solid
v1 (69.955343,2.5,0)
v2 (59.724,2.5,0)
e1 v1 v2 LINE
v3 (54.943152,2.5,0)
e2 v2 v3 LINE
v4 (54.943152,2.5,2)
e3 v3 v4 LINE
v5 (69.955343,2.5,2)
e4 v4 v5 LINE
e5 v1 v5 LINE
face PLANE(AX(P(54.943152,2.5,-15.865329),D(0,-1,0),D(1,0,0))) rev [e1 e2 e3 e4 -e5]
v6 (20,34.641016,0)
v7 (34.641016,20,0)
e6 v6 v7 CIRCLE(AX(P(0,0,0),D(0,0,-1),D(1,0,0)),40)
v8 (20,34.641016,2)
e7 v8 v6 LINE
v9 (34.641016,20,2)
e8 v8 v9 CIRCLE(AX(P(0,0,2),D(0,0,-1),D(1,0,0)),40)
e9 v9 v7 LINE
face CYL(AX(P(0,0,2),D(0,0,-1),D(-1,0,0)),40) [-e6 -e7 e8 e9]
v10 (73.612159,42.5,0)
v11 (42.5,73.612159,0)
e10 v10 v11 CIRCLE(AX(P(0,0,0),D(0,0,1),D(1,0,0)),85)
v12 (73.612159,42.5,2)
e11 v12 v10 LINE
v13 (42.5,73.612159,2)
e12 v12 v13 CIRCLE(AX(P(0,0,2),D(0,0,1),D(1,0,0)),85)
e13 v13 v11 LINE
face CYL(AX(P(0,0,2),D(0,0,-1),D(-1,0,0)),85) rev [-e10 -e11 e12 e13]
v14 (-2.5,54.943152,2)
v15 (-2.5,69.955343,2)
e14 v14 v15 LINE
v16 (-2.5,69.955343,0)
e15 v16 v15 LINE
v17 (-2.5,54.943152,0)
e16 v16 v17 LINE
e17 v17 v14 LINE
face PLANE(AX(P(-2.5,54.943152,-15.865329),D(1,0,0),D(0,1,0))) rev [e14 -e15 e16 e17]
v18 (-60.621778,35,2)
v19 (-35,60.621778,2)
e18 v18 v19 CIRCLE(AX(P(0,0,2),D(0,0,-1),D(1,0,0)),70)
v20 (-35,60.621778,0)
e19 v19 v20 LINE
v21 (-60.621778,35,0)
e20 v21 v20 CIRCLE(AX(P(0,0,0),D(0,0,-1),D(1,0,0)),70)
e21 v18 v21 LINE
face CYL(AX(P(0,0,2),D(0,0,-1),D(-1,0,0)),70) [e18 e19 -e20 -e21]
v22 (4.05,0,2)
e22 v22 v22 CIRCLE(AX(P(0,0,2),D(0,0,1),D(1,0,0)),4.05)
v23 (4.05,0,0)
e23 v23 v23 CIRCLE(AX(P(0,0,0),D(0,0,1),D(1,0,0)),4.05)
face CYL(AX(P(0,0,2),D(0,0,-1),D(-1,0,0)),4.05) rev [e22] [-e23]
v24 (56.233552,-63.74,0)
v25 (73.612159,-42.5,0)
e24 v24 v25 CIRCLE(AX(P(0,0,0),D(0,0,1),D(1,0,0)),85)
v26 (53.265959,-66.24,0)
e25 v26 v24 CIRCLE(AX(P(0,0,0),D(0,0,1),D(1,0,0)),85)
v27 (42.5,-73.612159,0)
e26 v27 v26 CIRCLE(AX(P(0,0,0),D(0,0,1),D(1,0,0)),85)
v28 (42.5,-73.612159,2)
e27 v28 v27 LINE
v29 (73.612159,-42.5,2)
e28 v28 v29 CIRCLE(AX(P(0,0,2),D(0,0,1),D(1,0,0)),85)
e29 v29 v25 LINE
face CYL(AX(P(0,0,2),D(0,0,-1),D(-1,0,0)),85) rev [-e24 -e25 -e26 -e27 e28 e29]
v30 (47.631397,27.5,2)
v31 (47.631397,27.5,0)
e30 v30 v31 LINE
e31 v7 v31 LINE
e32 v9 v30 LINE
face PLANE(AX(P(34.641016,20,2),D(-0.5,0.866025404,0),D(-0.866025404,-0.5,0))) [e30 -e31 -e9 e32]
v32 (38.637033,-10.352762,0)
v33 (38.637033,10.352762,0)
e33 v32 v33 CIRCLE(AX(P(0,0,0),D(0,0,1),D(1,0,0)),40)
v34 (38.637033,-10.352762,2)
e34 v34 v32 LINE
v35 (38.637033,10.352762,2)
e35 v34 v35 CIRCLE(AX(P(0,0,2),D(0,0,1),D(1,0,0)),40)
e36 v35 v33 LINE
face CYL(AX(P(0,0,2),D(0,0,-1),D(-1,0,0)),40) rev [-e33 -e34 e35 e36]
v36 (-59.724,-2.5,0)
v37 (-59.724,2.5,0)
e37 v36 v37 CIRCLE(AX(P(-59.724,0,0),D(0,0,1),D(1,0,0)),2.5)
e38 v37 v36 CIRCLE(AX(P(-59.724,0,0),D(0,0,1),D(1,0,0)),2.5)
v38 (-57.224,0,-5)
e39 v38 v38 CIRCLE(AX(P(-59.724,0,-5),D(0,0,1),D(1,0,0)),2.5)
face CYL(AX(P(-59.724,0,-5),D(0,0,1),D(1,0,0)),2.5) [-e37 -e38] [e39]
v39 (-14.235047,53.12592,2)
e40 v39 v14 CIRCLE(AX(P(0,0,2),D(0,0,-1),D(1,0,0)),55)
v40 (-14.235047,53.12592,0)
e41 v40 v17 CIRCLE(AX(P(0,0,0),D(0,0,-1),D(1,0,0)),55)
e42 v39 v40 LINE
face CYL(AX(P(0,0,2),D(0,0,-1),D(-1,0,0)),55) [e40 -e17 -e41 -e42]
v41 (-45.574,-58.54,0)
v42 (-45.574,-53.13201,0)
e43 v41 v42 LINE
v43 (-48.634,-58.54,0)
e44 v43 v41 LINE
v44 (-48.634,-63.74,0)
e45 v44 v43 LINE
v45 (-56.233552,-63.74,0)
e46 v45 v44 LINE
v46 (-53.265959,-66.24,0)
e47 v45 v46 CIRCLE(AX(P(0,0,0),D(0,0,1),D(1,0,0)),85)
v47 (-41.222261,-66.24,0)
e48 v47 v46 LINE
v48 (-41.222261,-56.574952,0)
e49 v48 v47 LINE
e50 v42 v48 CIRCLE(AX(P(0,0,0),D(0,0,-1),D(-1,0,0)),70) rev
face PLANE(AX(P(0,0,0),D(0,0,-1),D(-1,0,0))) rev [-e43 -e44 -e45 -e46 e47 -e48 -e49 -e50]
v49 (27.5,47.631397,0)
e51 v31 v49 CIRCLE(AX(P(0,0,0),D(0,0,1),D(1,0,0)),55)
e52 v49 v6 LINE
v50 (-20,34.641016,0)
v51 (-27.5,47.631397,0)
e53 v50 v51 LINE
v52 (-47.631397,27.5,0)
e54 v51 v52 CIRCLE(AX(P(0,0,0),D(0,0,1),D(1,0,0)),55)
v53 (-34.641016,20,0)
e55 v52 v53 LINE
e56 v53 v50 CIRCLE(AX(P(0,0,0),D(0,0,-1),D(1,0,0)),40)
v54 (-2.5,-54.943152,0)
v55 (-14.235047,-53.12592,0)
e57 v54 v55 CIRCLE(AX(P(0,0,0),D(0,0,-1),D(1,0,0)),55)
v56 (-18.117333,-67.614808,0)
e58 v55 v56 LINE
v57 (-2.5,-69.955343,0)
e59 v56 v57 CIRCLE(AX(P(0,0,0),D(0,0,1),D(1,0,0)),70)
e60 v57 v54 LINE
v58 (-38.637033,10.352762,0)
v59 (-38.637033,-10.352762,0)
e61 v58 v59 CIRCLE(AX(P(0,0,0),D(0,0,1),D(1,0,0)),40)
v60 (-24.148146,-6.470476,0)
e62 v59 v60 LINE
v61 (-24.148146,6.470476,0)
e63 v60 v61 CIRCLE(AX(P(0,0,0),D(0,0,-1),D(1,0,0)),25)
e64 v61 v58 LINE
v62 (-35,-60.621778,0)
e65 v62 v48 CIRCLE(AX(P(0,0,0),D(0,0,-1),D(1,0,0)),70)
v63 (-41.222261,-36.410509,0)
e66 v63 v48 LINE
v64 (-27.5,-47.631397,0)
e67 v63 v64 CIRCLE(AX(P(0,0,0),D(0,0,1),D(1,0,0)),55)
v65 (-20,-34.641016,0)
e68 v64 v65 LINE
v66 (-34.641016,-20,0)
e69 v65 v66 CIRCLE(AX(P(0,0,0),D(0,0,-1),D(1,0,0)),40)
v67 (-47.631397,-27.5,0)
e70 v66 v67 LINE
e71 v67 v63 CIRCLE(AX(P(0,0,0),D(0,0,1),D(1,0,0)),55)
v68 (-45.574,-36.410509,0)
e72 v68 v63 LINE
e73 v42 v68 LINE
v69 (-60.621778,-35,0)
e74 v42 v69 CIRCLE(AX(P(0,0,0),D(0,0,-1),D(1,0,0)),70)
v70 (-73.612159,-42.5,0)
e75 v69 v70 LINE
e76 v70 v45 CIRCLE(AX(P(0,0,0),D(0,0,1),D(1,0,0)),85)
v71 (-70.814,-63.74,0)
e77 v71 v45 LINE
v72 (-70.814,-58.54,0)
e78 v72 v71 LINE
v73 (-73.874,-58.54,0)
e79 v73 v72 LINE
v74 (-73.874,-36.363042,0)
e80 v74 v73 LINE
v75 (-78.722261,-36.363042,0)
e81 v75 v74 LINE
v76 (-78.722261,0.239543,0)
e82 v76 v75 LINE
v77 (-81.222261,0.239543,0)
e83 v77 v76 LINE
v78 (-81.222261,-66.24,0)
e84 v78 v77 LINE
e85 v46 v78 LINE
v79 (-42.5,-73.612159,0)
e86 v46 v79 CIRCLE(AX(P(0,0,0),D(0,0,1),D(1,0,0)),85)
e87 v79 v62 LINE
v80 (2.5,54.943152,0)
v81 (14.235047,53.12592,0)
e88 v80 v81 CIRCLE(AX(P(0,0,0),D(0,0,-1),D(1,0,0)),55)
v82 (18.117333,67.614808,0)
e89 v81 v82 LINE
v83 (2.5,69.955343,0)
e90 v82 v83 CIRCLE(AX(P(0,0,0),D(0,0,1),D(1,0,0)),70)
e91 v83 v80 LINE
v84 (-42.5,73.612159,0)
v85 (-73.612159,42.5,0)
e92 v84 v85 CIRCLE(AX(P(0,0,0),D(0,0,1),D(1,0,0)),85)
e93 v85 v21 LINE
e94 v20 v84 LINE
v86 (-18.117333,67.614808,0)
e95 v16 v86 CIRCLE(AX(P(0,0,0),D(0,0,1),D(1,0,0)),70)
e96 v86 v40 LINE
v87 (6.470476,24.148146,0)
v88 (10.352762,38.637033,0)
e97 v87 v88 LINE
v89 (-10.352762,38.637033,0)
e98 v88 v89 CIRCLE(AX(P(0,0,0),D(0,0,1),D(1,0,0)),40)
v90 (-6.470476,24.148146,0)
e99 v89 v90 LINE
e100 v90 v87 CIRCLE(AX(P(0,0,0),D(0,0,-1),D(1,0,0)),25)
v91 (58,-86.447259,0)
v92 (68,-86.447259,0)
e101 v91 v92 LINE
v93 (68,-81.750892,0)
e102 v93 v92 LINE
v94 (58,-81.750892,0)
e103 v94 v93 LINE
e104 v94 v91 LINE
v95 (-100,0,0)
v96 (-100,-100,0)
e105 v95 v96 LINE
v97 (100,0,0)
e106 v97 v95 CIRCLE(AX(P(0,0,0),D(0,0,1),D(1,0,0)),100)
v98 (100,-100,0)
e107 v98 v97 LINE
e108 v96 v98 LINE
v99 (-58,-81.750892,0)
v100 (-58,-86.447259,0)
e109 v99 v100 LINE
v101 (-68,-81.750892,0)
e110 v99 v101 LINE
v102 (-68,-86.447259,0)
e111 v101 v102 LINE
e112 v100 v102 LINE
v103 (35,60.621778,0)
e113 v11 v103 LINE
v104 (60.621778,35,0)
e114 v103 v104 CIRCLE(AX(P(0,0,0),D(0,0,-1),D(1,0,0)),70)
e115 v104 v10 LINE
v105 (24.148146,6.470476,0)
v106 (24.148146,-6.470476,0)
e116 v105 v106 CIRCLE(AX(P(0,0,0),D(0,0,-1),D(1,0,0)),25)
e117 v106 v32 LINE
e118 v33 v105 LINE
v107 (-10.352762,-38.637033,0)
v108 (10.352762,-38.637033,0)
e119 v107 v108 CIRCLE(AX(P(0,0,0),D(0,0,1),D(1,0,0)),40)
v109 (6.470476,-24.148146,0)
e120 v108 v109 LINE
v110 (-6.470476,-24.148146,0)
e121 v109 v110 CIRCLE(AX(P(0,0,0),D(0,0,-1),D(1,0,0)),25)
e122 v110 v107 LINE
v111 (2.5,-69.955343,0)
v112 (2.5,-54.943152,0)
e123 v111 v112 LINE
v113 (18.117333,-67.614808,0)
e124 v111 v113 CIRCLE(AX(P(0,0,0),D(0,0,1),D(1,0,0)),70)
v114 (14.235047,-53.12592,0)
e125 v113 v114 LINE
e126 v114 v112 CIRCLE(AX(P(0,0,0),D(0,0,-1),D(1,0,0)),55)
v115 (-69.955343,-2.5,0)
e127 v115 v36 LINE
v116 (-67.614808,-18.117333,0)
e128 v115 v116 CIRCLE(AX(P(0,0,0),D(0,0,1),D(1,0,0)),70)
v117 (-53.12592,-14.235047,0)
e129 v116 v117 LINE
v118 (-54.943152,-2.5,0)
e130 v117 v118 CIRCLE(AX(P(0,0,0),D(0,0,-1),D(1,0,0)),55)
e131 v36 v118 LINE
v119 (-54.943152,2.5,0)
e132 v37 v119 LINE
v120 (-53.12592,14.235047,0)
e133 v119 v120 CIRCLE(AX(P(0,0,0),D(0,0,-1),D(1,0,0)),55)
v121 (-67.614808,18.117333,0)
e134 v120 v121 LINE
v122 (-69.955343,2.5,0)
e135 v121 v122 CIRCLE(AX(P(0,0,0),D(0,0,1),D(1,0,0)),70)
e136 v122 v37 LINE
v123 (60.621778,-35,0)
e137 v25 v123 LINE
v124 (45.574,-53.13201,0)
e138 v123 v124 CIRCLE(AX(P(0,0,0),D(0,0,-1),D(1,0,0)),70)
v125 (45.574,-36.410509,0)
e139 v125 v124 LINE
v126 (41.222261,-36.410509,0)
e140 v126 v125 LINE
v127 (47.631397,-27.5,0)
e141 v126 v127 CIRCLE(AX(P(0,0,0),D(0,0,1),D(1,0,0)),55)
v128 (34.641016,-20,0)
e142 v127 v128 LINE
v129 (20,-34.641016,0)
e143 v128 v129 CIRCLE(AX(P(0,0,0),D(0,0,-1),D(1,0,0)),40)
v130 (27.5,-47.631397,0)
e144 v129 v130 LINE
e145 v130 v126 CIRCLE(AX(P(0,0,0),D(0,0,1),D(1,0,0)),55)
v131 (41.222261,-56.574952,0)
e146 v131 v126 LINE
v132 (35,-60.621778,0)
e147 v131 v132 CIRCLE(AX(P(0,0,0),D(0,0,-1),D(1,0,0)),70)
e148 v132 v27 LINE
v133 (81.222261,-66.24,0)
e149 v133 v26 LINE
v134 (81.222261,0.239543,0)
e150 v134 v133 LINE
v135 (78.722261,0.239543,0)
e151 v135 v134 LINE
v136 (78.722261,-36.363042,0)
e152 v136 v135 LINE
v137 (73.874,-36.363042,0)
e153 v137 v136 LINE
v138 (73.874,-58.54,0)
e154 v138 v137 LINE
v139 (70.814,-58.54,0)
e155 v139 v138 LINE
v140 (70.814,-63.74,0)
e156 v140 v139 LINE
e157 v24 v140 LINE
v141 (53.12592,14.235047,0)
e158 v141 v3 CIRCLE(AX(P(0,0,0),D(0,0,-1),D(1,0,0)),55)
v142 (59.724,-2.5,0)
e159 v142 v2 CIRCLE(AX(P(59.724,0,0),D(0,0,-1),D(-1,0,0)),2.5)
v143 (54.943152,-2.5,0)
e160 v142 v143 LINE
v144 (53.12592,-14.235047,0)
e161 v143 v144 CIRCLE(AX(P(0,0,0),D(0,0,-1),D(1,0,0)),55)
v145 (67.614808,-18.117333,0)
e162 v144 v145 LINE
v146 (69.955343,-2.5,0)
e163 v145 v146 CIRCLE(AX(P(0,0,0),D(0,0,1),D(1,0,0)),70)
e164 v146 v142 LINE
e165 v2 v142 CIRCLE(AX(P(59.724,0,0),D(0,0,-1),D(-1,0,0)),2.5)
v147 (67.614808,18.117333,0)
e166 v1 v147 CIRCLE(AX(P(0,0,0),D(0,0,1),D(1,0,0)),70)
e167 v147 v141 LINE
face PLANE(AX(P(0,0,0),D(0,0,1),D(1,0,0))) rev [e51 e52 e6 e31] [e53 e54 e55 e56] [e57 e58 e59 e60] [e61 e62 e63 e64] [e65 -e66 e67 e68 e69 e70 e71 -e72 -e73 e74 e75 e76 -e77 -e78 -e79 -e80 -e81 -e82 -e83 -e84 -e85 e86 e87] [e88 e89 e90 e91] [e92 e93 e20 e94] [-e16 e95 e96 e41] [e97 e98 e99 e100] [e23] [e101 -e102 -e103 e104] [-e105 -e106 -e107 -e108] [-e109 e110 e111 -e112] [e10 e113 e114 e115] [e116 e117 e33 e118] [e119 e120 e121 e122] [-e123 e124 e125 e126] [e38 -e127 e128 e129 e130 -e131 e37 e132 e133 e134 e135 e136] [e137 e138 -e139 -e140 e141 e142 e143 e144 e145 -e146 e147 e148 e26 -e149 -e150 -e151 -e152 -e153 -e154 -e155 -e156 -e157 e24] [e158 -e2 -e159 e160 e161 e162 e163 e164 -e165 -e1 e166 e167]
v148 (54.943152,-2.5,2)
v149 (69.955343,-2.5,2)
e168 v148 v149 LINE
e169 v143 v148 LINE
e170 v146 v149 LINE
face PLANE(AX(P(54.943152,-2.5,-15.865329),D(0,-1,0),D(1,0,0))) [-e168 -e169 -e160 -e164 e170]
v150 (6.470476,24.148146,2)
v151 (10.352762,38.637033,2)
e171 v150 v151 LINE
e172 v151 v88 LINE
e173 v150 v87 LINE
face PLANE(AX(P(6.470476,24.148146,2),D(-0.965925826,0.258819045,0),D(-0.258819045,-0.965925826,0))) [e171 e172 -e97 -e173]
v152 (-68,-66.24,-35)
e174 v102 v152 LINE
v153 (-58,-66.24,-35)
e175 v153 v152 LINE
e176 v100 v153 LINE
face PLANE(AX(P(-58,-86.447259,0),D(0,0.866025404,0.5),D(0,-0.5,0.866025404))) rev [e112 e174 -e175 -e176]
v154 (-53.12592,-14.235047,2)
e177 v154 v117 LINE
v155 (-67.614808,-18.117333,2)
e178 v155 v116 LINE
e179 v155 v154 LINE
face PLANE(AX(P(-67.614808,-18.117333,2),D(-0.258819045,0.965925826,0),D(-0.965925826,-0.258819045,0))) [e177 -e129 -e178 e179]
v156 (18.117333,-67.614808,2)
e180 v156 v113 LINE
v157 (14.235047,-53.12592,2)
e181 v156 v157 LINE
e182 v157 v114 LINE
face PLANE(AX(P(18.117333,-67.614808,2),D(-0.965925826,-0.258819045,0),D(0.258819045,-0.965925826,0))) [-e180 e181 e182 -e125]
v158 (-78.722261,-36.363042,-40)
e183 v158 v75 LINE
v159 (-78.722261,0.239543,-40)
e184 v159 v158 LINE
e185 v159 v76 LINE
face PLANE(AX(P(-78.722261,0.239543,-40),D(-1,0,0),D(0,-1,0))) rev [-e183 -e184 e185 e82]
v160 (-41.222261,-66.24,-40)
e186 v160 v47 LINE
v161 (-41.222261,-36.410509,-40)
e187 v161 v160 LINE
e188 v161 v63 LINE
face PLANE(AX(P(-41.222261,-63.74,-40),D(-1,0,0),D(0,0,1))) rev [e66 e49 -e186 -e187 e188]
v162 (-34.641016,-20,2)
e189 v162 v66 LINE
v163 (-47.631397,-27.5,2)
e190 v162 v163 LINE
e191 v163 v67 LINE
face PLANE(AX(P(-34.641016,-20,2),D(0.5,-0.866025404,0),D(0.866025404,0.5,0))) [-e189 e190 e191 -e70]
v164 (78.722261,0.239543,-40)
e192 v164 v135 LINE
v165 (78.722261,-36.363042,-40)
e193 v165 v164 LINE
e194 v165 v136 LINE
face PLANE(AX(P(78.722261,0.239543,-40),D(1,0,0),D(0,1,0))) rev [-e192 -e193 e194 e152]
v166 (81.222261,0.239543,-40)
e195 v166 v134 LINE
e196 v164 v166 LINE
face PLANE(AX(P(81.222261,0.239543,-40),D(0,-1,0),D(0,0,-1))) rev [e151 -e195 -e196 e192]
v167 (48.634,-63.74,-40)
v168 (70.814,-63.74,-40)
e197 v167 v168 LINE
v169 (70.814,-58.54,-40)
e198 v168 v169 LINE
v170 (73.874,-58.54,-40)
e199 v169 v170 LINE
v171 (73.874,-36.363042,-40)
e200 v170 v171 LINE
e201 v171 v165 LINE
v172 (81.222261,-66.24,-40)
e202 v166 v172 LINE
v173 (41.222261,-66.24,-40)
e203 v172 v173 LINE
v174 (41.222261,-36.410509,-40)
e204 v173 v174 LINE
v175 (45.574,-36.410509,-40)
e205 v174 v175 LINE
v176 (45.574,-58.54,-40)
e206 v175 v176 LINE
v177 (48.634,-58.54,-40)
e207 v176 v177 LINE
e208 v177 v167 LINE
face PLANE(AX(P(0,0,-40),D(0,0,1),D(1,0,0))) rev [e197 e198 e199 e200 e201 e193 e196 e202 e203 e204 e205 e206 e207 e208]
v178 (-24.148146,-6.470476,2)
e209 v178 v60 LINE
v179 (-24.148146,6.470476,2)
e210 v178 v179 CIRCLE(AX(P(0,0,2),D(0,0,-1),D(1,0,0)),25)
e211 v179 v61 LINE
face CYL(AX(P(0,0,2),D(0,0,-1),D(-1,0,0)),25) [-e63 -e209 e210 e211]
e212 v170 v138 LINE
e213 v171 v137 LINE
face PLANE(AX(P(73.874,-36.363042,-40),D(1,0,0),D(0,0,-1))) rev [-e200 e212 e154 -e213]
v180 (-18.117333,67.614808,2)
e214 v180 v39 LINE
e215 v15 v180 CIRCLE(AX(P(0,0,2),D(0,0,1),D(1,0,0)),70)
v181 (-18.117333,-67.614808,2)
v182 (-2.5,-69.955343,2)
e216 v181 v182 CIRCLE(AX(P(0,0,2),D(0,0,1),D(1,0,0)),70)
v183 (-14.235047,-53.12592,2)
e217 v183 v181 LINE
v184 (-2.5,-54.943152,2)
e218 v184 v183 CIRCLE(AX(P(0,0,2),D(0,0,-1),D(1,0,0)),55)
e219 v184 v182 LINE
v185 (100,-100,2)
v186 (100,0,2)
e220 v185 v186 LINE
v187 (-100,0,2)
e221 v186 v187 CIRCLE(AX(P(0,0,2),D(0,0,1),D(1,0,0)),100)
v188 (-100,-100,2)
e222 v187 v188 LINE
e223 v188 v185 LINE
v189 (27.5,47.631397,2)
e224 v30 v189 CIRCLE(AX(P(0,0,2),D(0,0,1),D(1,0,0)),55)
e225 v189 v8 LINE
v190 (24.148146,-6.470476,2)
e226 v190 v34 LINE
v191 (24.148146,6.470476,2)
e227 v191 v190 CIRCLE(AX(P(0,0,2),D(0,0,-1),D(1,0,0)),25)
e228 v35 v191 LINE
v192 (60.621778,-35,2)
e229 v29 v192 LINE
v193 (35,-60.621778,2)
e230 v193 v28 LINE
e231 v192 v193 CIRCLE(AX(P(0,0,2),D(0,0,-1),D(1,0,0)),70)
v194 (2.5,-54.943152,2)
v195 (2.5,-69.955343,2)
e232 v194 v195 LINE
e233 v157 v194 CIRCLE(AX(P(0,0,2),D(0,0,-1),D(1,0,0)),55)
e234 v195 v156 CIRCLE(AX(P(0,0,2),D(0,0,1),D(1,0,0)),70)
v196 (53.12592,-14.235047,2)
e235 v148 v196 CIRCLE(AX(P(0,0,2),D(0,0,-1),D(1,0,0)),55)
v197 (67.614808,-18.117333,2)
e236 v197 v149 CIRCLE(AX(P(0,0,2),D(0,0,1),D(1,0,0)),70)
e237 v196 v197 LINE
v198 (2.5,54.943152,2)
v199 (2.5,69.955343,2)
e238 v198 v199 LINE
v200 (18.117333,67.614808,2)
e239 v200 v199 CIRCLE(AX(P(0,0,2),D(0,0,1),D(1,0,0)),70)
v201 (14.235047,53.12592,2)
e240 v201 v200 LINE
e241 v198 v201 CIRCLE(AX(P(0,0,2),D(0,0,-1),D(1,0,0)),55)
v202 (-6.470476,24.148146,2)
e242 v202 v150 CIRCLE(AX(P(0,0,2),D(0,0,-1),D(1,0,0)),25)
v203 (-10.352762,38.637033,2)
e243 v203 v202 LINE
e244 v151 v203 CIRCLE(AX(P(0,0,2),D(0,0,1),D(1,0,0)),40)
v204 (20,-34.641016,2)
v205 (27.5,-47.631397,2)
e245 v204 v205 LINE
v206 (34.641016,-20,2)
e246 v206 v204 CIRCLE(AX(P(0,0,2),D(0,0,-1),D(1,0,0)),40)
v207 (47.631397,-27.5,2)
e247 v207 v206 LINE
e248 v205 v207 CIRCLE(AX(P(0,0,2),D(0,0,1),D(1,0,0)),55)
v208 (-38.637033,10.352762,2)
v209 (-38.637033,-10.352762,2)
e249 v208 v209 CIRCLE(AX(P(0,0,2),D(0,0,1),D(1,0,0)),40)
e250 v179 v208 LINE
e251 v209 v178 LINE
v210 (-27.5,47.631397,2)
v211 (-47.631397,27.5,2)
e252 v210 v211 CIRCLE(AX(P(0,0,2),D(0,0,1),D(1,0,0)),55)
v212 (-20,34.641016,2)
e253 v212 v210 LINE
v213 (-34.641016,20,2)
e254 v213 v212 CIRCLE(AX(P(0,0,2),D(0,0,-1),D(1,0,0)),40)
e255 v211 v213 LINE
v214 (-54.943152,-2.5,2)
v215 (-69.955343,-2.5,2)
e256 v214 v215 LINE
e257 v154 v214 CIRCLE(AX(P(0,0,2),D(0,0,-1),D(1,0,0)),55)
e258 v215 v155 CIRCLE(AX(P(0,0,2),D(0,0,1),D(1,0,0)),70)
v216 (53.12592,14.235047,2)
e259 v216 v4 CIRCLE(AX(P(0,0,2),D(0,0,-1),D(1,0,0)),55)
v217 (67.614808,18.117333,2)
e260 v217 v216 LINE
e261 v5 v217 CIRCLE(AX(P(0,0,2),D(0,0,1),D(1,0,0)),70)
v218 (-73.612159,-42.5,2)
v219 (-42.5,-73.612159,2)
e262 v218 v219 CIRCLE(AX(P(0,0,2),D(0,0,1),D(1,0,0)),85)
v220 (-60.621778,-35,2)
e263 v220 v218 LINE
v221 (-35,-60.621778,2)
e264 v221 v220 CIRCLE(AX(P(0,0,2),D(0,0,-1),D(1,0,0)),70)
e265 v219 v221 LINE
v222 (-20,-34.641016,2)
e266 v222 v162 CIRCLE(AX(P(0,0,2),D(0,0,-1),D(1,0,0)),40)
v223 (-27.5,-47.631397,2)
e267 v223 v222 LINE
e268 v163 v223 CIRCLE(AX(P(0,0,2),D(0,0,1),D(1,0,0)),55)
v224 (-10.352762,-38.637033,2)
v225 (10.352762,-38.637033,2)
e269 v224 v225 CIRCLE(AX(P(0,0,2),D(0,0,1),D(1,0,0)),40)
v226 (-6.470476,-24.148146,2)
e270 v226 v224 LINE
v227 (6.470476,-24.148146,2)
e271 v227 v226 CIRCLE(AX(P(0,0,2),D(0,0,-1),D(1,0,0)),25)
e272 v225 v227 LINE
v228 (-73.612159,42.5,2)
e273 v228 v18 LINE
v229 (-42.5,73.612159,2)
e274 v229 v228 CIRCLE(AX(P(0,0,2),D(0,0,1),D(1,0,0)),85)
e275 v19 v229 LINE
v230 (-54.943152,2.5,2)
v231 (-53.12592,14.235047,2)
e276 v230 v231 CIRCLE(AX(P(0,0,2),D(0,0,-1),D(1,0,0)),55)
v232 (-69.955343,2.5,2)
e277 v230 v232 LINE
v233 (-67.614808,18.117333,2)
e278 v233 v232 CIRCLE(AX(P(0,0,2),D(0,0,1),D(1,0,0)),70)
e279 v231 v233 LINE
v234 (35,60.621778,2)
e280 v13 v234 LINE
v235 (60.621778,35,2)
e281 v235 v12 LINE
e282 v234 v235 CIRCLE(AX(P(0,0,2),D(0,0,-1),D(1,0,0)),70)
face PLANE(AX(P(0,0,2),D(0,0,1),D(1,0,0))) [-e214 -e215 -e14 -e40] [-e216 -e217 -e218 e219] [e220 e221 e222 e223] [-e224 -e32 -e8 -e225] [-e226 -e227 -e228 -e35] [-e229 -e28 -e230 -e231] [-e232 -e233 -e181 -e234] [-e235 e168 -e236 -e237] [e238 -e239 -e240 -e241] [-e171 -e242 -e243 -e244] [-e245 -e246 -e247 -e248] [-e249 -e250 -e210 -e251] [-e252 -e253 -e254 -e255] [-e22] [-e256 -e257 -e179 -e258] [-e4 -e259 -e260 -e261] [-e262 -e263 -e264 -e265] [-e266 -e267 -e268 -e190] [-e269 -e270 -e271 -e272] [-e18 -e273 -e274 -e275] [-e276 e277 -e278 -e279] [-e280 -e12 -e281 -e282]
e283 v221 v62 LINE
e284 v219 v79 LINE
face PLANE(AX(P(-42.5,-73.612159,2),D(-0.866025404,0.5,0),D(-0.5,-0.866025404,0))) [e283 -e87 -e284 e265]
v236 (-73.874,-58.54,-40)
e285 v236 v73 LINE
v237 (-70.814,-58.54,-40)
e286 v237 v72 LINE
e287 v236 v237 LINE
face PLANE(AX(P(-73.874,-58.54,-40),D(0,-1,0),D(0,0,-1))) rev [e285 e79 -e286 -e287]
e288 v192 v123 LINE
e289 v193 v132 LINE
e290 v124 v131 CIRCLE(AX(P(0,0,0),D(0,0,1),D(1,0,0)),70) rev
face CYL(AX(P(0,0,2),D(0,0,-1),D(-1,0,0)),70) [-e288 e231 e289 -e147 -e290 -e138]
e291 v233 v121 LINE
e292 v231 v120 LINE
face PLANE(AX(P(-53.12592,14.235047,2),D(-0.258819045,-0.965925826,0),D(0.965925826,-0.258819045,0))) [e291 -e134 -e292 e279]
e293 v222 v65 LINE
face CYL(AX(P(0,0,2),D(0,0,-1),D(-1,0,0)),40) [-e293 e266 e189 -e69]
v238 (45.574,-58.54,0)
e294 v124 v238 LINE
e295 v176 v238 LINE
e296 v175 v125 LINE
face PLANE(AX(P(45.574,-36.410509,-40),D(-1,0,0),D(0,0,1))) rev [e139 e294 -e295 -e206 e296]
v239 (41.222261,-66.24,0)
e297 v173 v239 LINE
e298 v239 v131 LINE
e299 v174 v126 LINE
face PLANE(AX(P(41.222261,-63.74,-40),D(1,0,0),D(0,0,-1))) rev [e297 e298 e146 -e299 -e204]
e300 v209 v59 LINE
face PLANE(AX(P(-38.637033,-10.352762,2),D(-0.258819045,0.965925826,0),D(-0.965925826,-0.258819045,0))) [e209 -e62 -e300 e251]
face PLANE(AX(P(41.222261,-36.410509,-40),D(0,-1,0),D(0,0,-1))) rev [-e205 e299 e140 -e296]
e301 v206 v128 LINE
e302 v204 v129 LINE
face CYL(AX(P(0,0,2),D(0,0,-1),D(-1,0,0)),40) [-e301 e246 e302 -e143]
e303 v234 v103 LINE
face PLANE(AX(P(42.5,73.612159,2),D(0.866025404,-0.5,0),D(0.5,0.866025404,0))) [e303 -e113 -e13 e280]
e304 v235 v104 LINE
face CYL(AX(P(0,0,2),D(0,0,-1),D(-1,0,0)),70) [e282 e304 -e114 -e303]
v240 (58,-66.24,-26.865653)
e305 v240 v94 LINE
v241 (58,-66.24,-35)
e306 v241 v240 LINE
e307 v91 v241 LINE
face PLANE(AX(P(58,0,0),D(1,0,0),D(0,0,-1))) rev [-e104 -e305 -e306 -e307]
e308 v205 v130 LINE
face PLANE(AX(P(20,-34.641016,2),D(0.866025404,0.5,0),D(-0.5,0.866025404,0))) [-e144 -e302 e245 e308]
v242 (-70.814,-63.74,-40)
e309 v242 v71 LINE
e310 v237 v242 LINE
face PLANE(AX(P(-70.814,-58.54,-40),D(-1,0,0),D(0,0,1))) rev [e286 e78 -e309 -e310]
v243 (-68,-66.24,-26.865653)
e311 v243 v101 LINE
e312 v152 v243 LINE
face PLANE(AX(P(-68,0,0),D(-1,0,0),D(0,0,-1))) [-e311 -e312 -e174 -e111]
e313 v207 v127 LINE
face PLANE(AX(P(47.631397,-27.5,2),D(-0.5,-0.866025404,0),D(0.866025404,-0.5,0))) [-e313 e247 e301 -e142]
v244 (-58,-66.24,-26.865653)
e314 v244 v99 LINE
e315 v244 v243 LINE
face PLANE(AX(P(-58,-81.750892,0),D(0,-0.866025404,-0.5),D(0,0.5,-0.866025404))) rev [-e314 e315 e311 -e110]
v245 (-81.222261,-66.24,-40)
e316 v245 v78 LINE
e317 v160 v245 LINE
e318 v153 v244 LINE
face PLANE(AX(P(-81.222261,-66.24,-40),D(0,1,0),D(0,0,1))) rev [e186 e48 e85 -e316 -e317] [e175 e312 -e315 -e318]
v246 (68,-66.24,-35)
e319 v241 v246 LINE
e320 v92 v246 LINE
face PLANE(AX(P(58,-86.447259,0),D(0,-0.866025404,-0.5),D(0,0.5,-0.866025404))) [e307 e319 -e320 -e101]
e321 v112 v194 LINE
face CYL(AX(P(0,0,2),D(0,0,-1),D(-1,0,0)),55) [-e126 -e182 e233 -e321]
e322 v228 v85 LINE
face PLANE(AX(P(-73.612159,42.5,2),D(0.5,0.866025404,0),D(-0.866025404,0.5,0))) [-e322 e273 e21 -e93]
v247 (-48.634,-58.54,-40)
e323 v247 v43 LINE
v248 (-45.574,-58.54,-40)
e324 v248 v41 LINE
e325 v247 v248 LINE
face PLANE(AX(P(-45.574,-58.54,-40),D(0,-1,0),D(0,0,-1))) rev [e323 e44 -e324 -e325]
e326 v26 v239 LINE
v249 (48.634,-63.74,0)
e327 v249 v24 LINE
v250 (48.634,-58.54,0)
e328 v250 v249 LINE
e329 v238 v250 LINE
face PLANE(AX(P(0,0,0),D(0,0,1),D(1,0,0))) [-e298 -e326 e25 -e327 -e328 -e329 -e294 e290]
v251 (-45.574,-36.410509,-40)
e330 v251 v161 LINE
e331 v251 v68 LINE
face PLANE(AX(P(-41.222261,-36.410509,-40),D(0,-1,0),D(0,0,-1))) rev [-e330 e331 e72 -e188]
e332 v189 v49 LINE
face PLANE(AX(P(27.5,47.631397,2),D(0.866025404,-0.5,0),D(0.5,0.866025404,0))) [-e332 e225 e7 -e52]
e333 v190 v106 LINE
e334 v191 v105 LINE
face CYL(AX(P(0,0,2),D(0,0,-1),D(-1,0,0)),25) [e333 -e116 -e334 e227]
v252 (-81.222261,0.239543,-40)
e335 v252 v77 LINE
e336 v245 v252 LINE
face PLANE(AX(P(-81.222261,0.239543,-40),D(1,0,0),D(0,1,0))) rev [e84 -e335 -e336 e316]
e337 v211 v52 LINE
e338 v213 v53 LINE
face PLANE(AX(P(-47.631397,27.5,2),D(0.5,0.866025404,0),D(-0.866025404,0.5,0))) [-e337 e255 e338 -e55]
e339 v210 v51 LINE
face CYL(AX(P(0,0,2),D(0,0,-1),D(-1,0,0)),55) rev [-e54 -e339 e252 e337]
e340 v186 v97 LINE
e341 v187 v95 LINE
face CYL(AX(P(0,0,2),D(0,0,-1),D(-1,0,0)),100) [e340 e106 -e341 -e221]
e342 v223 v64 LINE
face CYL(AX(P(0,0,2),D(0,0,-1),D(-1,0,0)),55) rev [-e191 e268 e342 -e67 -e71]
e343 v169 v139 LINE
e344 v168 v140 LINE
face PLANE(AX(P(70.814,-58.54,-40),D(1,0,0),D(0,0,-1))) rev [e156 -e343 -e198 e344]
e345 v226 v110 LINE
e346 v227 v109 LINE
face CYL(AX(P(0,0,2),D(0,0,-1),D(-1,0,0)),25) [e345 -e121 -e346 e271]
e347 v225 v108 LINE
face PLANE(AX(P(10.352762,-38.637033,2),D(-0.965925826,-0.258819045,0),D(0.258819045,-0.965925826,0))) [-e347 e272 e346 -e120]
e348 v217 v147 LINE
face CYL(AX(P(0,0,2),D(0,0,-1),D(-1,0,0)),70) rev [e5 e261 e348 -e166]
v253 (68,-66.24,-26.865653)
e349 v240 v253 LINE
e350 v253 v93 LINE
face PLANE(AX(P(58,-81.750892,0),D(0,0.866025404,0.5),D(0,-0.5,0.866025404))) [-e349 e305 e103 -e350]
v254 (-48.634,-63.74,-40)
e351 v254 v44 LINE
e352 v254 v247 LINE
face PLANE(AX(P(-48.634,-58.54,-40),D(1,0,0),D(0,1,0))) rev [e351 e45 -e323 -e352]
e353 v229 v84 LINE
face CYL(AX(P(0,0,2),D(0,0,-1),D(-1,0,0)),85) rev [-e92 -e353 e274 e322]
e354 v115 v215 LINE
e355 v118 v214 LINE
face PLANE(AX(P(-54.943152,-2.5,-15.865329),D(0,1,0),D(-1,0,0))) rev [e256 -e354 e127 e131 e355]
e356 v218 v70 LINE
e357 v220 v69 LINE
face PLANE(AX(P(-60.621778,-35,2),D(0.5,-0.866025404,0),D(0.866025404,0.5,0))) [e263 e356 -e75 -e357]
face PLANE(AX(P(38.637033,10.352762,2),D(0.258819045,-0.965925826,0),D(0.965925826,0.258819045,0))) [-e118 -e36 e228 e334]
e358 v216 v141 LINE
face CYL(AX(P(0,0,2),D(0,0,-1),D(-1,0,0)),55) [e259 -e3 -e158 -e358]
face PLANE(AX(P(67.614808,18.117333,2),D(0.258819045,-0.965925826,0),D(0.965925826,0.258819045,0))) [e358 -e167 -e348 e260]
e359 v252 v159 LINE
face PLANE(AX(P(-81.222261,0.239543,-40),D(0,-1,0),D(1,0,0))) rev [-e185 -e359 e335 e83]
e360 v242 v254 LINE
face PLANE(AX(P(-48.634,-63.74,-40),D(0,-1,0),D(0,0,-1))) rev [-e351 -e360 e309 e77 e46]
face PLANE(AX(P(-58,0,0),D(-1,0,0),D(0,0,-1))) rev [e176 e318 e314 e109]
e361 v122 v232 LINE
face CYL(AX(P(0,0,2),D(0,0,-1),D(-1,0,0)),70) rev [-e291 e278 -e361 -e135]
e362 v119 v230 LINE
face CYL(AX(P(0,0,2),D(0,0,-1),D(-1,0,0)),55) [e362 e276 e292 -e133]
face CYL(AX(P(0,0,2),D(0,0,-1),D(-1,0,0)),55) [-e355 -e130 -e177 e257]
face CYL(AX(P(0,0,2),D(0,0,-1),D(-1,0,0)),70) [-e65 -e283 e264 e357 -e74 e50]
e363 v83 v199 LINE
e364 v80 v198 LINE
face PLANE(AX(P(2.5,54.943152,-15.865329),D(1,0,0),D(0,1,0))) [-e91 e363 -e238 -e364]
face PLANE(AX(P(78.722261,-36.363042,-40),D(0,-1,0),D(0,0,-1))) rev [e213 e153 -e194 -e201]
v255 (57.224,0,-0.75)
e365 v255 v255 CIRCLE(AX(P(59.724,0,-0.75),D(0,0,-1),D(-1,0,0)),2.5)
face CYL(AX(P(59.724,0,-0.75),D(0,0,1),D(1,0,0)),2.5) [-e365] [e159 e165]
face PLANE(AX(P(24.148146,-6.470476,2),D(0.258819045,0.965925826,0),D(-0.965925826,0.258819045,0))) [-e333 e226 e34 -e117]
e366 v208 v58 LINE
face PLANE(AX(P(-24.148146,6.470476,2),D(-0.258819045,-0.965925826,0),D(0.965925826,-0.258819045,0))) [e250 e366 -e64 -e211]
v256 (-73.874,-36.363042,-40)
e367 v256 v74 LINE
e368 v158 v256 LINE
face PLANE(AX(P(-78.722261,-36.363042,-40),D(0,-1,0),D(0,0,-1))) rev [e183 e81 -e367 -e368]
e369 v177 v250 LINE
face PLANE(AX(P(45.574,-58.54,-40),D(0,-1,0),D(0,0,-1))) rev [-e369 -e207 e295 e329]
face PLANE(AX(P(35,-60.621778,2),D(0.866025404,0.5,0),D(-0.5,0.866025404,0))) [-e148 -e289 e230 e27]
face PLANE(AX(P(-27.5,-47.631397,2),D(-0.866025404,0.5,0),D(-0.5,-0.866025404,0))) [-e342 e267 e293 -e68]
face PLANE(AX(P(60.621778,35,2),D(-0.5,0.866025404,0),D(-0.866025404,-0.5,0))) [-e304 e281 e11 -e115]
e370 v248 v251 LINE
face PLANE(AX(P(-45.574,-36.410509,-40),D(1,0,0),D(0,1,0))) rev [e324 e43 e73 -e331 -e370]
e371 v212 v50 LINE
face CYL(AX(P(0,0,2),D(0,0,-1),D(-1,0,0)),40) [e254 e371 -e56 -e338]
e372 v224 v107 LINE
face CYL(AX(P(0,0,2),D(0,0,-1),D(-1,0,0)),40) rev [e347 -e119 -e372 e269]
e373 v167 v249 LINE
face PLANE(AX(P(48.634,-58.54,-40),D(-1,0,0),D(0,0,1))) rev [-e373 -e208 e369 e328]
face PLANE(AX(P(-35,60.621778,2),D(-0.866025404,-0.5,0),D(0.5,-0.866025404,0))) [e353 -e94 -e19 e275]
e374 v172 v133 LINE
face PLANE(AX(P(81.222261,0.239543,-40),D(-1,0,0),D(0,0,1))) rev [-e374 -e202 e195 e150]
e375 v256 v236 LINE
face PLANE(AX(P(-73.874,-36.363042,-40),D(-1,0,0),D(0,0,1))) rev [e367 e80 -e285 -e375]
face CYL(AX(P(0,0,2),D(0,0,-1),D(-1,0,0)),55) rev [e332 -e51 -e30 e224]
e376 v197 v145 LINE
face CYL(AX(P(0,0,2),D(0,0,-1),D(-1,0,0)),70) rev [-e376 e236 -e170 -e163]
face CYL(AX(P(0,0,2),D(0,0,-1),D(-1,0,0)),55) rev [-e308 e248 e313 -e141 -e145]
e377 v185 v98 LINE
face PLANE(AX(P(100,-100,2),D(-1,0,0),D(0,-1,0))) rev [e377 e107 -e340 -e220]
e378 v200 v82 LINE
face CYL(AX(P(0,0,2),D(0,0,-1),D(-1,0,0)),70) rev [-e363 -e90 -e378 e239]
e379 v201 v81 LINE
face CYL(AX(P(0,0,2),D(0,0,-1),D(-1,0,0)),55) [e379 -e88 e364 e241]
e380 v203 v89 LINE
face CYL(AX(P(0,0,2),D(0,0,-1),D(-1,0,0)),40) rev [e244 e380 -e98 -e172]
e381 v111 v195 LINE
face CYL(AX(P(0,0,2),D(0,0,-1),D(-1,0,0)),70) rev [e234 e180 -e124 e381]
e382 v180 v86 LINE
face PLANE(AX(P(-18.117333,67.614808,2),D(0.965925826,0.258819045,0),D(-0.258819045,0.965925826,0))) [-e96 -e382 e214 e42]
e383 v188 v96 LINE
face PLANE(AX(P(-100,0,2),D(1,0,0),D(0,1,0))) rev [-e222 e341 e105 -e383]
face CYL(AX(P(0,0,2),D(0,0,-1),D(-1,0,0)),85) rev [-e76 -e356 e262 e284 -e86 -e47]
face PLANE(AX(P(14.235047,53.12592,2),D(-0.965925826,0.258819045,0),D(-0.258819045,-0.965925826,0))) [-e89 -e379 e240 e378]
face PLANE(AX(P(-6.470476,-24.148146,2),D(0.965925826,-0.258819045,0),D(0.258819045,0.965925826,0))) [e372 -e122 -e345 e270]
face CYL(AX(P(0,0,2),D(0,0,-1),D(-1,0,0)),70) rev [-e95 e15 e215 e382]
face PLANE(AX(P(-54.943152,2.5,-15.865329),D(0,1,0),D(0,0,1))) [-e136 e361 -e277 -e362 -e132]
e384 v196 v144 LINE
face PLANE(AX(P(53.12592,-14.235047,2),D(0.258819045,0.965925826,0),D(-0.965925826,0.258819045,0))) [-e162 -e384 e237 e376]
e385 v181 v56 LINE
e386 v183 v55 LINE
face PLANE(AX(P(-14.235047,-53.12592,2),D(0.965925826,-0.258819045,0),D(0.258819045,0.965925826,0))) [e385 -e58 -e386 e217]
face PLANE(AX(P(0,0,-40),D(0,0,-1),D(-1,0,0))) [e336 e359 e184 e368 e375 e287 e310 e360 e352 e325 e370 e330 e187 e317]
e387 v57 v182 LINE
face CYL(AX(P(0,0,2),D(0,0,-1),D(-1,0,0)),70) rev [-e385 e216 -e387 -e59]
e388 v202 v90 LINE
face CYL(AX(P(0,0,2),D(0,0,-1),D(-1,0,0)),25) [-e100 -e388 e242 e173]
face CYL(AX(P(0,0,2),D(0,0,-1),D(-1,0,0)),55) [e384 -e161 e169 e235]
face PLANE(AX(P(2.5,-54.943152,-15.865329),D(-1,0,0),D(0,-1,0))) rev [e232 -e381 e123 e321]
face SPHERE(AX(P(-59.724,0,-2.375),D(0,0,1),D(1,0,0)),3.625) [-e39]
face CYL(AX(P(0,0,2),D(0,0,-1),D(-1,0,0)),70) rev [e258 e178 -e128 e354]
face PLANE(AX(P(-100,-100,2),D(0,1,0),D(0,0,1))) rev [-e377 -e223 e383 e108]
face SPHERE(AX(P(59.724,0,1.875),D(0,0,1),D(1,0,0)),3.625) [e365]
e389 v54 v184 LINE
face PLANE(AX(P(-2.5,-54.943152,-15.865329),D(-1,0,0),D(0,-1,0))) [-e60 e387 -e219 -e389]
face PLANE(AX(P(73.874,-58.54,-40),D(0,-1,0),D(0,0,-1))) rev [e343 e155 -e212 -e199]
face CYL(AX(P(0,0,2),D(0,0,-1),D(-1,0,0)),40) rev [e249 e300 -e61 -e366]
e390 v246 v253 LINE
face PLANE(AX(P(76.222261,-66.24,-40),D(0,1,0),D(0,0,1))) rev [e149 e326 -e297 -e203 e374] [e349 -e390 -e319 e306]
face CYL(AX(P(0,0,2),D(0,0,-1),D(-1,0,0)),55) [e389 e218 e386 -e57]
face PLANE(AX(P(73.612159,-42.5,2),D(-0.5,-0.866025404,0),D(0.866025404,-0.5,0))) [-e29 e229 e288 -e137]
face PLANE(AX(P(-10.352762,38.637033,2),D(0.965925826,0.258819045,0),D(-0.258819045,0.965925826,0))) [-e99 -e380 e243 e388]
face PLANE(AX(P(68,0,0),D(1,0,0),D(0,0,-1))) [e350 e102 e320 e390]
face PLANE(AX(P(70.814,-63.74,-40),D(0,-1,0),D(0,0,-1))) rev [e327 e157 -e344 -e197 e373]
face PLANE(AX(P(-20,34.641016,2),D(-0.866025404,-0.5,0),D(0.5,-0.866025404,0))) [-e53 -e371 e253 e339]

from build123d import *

# Parameters (mm, degrees)
SKETCH2_R           = 4.05
BOSS_EXTRUDE1_DEPTH = 2
BOSS_EXTRUDE2_DEPTH = 40
BOSS_EXTRUDE3_DEPTH = 5
BOSS_EXTRUDE4_DEPTH = 2
SKETCH10_R          = 2.5
BOSS_EXTRUDE5_DEPTH = 7
DOME1_FACE_RADIUS   = 2.5
DOME1_HEIGHT        = 1
SKETCH12_R          = 2.5
BOSS_EXTRUDE6_DEPTH = 0.75
DOME2_FACE_RADIUS   = 2.5
DOME2_HEIGHT        = 1


with BuildPart() as part:
    # Sketch2 → Boss-Extrude1 (new body)
    with BuildSketch(Plane.XY):
        with BuildLine():
            Line((-100, 0), (-100, -100))
            Line((-100, -100), (100, -100))
            Line((100, -100), (100, 0))
            ThreePointArc((100, 0), (0, 100), (-100, 0))
        make_face()
        Circle(SKETCH2_R, mode=Mode.SUBTRACT)
        with BuildLine():
            Line((6.470476128, 24.148145657), (10.352761804, 38.637033052))
            ThreePointArc((10.352761804, 38.637033052), (0, 40), (-10.352761804, 38.637033052))
            Line((-10.352761804, 38.637033052), (-6.470476128, 24.148145657))
            ThreePointArc((-6.470476128, 24.148145657), (0, 25), (6.470476128, 24.148145657))
        make_face(mode=Mode.SUBTRACT)
        with BuildLine():
            Line((14.235047481, 53.125920446), (18.117333157, 67.61480784))
            ThreePointArc((18.117333157, 67.61480784), (0, 70), (-18.117333157, 67.61480784))
            Line((-18.117333157, 67.61480784), (-14.235047481, 53.125920446))
            ThreePointArc((-14.235047481, 53.125920446), (0, 55), (14.235047481, 53.125920446))
        make_face(mode=Mode.SUBTRACT)
        with BuildLine():
            Line((-20, 34.641016151), (-27.5, 47.631397208))
            ThreePointArc((-27.5, 47.631397208), (-38.890872965, 38.890872965), (-47.631397208, 27.5))
            Line((-47.631397208, 27.5), (-34.641016151, 20))
            ThreePointArc((-34.641016151, 20), (-28.284271247, 28.284271247), (-20, 34.641016151))
        make_face(mode=Mode.SUBTRACT)
        with BuildLine():
            Line((-35, 60.621778265), (-42.5, 73.612159322))
            ThreePointArc((-42.5, 73.612159322), (-60.104076401, 60.104076401), (-73.612159322, 42.5))
            Line((-73.612159322, 42.5), (-60.621778265, 35))
            ThreePointArc((-60.621778265, 35), (-49.497474683, 49.497474683), (-35, 60.621778265))
        make_face(mode=Mode.SUBTRACT)
        with BuildLine():
            Line((42.5, 73.612159322), (35, 60.621778265))
            ThreePointArc((35, 60.621778265), (49.497474683, 49.497474683), (60.621778265, 35))
            Line((60.621778265, 35), (73.612159322, 42.5))
            ThreePointArc((73.612159322, 42.5), (60.104076401, 60.104076401), (42.5, 73.612159322))
        make_face(mode=Mode.SUBTRACT)
        with BuildLine():
            Line((27.5, 47.631397208), (20, 34.641016151))
            ThreePointArc((20, 34.641016151), (28.284271247, 28.284271247), (34.641016151, 20))
            Line((34.641016151, 20), (47.631397208, 27.5))
            ThreePointArc((47.631397208, 27.5), (38.890872965, 38.890872965), (27.5, 47.631397208))
        make_face(mode=Mode.SUBTRACT)
        with BuildLine():
            Line((24.148145657, -6.470476128), (38.637033052, -10.352761804))
            ThreePointArc((38.637033052, -10.352761804), (40, 0), (38.637033052, 10.352761804))
            Line((38.637033052, 10.352761804), (24.148145657, 6.470476128))
            ThreePointArc((24.148145657, 6.470476128), (25, 0), (24.148145657, -6.470476128))
        make_face(mode=Mode.SUBTRACT)
        with BuildLine():
            Line((53.125920446, -14.235047481), (67.61480784, -18.117333157))
            ThreePointArc((67.61480784, -18.117333157), (70, 0), (67.61480784, 18.117333157))
            Line((67.61480784, 18.117333157), (53.125920446, 14.235047481))
            ThreePointArc((53.125920446, 14.235047481), (55, 0), (53.125920446, -14.235047481))
        make_face(mode=Mode.SUBTRACT)
        with BuildLine():
            Line((73.612159322, -42.5), (60.621778265, -35))
            ThreePointArc((60.621778265, -35), (49.497474683, -49.497474683), (35, -60.621778265))
            Line((35, -60.621778265), (42.5, -73.612159322))
            ThreePointArc((42.5, -73.612159322), (60.104076401, -60.104076401), (73.612159322, -42.5))
        make_face(mode=Mode.SUBTRACT)
        with BuildLine():
            Line((47.631397208, -27.5), (34.641016151, -20))
            ThreePointArc((34.641016151, -20), (28.284271247, -28.284271247), (20, -34.641016151))
            Line((20, -34.641016151), (27.5, -47.631397208))
            ThreePointArc((27.5, -47.631397208), (38.890872965, -38.890872965), (47.631397208, -27.5))
        make_face(mode=Mode.SUBTRACT)
        with BuildLine():
            Line((-6.470476128, -24.148145657), (-10.352761804, -38.637033052))
            ThreePointArc((-10.352761804, -38.637033052), (0, -40), (10.352761804, -38.637033052))
            Line((10.352761804, -38.637033052), (6.470476128, -24.148145657))
            ThreePointArc((6.470476128, -24.148145657), (0, -25), (-6.470476128, -24.148145657))
        make_face(mode=Mode.SUBTRACT)
        with BuildLine():
            Line((-14.235047481, -53.125920446), (-18.117333157, -67.61480784))
            ThreePointArc((-18.117333157, -67.61480784), (0, -70), (18.117333157, -67.61480784))
            Line((18.117333157, -67.61480784), (14.235047481, -53.125920446))
            ThreePointArc((14.235047481, -53.125920446), (0, -55), (-14.235047481, -53.125920446))
        make_face(mode=Mode.SUBTRACT)
        with BuildLine():
            Line((-42.5, -73.612159322), (-35, -60.621778265))
            ThreePointArc((-35, -60.621778265), (-49.497474683, -49.497474683), (-60.621778265, -35))
            Line((-60.621778265, -35), (-73.612159322, -42.5))
            ThreePointArc((-73.612159322, -42.5), (-60.104076401, -60.104076401), (-42.5, -73.612159322))
        make_face(mode=Mode.SUBTRACT)
        with BuildLine():
            Line((-27.5, -47.631397208), (-20, -34.641016151))
            ThreePointArc((-20, -34.641016151), (-28.284271247, -28.284271247), (-34.641016151, -20))
            Line((-34.641016151, -20), (-47.631397208, -27.5))
            ThreePointArc((-47.631397208, -27.5), (-38.890872965, -38.890872965), (-27.5, -47.631397208))
        make_face(mode=Mode.SUBTRACT)
        with BuildLine():
            Line((-24.148145657, 6.470476128), (-38.637033052, 10.352761804))
            ThreePointArc((-38.637033052, 10.352761804), (-40, 0), (-38.637033052, -10.352761804))
            Line((-38.637033052, -10.352761804), (-24.148145657, -6.470476128))
            ThreePointArc((-24.148145657, -6.470476128), (-25, 0), (-24.148145657, 6.470476128))
        make_face(mode=Mode.SUBTRACT)
        with BuildLine():
            Line((-53.125920446, 14.235047481), (-67.61480784, 18.117333157))
            ThreePointArc((-67.61480784, 18.117333157), (-70, 0), (-67.61480784, -18.117333157))
            Line((-67.61480784, -18.117333157), (-53.125920446, -14.235047481))
            ThreePointArc((-53.125920446, -14.235047481), (-55, 0), (-53.125920446, 14.235047481))
        make_face(mode=Mode.SUBTRACT)
    extrude(amount=BOSS_EXTRUDE1_DEPTH)

    # Sketch4 → Boss-Extrude2 (add)
    with BuildSketch(Plane(origin=(0, 0, 0), x_dir=(-1, 0, 0), z_dir=(0, 0, -1))):
        Polygon((-70.814, -63.74), (-48.634, -63.74), (-48.634, -58.54), (-45.574, -58.54), (-45.574, -36.410509339), (-41.222261094, -36.410509339), (-41.222261094, -63.74), (-41.222261094, -66.24), (-76.222261094, -66.24), (-81.222261094, -66.24), (-81.222261094, 0.239543082), (-78.722261094, 0.239543082), (-78.722261094, -36.363042073), (-73.874, -36.363042073), (-73.874, -58.54), (-70.814, -58.54), align=None)
        Polygon((81.222261094, -66.24), (76.222261094, -66.24), (41.222261094, -66.24), (41.222261094, -63.74), (41.222261094, -36.410509339), (45.574, -36.410509339), (45.574, -58.54), (48.634, -58.54), (48.634, -63.74), (70.814, -63.74), (70.814, -58.54), (73.874, -58.54), (73.874, -36.363042073), (78.722261094, -36.363042073), (78.722261094, 0.239543082), (81.222261094, 0.239543082), align=None)
    extrude(amount=BOSS_EXTRUDE2_DEPTH)

    # Sketch7 → Boss-Extrude3 (add, symmetric)
    with BuildSketch(Plane(origin=(63, 0, 0), x_dir=(0, 0, -1), z_dir=(1, 0, 0))):
        Polygon((0, -86.447259422), (35, -66.24), (26.86565258, -66.24), (0, -81.750891749), align=None)
    boss_extrude3 = extrude(amount=BOSS_EXTRUDE3_DEPTH, both=True)

    # Mirror1: Boss-Extrude3 across plane
    add(boss_extrude3.mirror(Plane(origin=(0, 0, 0), x_dir=(0, 0, 1), z_dir=(1, 0, 0))))


with BuildPart() as boss_extrude4_tool:
    # Sketch8 → Boss-Extrude4 (new body)
    with BuildSketch(Plane.XY.offset(2)):
        with BuildLine():
            Line((-54.94315244, 2.5), (-69.955342898, 2.5))
            add(Edge.make_bspline(
                [(-69.955342898, 2.5), (-70.044657102, 0), (-69.955342898, -2.5)],
                knots=[0, 0, 0, 1, 1, 1], degree=2))
            Line((-69.955342898, -2.5), (-54.94315244, -2.5))
            add(Edge.make_bspline(
                [(-54.94315244, 2.5), (-55.05684756, 0), (-54.94315244, -2.5)],
                knots=[0, 0, 0, 1, 1, 1], degree=2))
        make_face()
        with BuildLine():
            Line((-2.5, 54.94315244), (-2.5, 69.955342898))
            add(Edge.make_bspline(
                [(2.5, 69.955342898), (0, 70.044657102), (-2.5, 69.955342898)],
                knots=[0, 0, 0, 1, 1, 1], degree=2))
            Line((2.5, 69.955342898), (2.5, 54.94315244))
            add(Edge.make_bspline(
                [(2.5, 54.94315244), (0, 55.05684756), (-2.5, 54.94315244)],
                knots=[0, 0, 0, 1, 1, 1], degree=2))
        make_face()
        with BuildLine():
            Line((54.94315244, 2.5), (69.955342898, 2.5))
            add(Edge.make_bspline(
                [(69.955342898, -2.5), (70.044657102, 0), (69.955342898, 2.5)],
                knots=[0, 0, 0, 1, 1, 1], degree=2))
            Line((69.955342898, -2.5), (54.94315244, -2.5))
            add(Edge.make_bspline(
                [(54.94315244, -2.5), (55.05684756, 0), (54.94315244, 2.5)],
                knots=[0, 0, 0, 1, 1, 1], degree=2))
        make_face()
        with BuildLine():
            Line((2.5, -54.94315244), (2.5, -69.955342898))
            add(Edge.make_bspline(
                [(-2.5, -69.955342898), (0, -70.044657102), (2.5, -69.955342898)],
                knots=[0, 0, 0, 1, 1, 1], degree=2))
            Line((-2.5, -69.955342898), (-2.5, -54.94315244))
            add(Edge.make_bspline(
                [(-2.5, -54.94315244), (0, -55.05684756), (2.5, -54.94315244)],
                knots=[0, 0, 0, 1, 1, 1], degree=2))
        make_face()
    extrude(amount=-BOSS_EXTRUDE4_DEPTH)


with BuildPart() as part_1:
    add(part.part)


with BuildPart() as part_2:
    # Boss-Extrude4: joined with boss_extrude4_tool
    add(part_1.part.fuse(boss_extrude4_tool.part, tol=0.00001))

    # Sketch10 → Boss-Extrude5 (add)
    with BuildSketch(Plane.XY.offset(2)):
        with Locations((-59.724, 0)):
            Circle(SKETCH10_R)
    extrude(amount=-BOSS_EXTRUDE5_DEPTH)

    # Dome1: a dome of height H over a round flat face of radius A is a cap of a sphere of radius (A * A + H * H) / (2 * H)
    dome1_r = (DOME1_FACE_RADIUS * DOME1_FACE_RADIUS + DOME1_HEIGHT * DOME1_HEIGHT) / (2 * DOME1_HEIGHT)
    dome1_base = Plane((-59.724, 0, -5), z_dir=(0, 0, -1))
    with Locations(dome1_base.offset(DOME1_HEIGHT - dome1_r)):
        dome1_ball = Sphere(dome1_r, mode=Mode.PRIVATE)
    add(split(dome1_ball, bisect_by=dome1_base, keep=Keep.TOP, mode=Mode.PRIVATE))

    # Sketch12 → Boss-Extrude6 (add)
    with BuildSketch(Plane(origin=(0, 0, 0), x_dir=(-1, 0, 0), z_dir=(0, 0, -1))):
        with Locations(Location((-59.724, 0, 0), (0, 0, 270))):
            Circle(SKETCH12_R)
    extrude(amount=BOSS_EXTRUDE6_DEPTH)

    # Dome2: a dome of height H over a round flat face of radius A is a cap of a sphere of radius (A * A + H * H) / (2 * H)
    dome2_r = (DOME2_FACE_RADIUS * DOME2_FACE_RADIUS + DOME2_HEIGHT * DOME2_HEIGHT) / (2 * DOME2_HEIGHT)
    dome2_base = Plane((59.724, 0, -0.75), z_dir=(0, 0, -1))
    with Locations(dome2_base.offset(DOME2_HEIGHT - dome2_r)):
        dome2_ball = Sphere(dome2_r, mode=Mode.PRIVATE)
    add(split(dome2_ball, bisect_by=dome2_base, keep=Keep.TOP, mode=Mode.PRIVATE))


solid = part_2.part
